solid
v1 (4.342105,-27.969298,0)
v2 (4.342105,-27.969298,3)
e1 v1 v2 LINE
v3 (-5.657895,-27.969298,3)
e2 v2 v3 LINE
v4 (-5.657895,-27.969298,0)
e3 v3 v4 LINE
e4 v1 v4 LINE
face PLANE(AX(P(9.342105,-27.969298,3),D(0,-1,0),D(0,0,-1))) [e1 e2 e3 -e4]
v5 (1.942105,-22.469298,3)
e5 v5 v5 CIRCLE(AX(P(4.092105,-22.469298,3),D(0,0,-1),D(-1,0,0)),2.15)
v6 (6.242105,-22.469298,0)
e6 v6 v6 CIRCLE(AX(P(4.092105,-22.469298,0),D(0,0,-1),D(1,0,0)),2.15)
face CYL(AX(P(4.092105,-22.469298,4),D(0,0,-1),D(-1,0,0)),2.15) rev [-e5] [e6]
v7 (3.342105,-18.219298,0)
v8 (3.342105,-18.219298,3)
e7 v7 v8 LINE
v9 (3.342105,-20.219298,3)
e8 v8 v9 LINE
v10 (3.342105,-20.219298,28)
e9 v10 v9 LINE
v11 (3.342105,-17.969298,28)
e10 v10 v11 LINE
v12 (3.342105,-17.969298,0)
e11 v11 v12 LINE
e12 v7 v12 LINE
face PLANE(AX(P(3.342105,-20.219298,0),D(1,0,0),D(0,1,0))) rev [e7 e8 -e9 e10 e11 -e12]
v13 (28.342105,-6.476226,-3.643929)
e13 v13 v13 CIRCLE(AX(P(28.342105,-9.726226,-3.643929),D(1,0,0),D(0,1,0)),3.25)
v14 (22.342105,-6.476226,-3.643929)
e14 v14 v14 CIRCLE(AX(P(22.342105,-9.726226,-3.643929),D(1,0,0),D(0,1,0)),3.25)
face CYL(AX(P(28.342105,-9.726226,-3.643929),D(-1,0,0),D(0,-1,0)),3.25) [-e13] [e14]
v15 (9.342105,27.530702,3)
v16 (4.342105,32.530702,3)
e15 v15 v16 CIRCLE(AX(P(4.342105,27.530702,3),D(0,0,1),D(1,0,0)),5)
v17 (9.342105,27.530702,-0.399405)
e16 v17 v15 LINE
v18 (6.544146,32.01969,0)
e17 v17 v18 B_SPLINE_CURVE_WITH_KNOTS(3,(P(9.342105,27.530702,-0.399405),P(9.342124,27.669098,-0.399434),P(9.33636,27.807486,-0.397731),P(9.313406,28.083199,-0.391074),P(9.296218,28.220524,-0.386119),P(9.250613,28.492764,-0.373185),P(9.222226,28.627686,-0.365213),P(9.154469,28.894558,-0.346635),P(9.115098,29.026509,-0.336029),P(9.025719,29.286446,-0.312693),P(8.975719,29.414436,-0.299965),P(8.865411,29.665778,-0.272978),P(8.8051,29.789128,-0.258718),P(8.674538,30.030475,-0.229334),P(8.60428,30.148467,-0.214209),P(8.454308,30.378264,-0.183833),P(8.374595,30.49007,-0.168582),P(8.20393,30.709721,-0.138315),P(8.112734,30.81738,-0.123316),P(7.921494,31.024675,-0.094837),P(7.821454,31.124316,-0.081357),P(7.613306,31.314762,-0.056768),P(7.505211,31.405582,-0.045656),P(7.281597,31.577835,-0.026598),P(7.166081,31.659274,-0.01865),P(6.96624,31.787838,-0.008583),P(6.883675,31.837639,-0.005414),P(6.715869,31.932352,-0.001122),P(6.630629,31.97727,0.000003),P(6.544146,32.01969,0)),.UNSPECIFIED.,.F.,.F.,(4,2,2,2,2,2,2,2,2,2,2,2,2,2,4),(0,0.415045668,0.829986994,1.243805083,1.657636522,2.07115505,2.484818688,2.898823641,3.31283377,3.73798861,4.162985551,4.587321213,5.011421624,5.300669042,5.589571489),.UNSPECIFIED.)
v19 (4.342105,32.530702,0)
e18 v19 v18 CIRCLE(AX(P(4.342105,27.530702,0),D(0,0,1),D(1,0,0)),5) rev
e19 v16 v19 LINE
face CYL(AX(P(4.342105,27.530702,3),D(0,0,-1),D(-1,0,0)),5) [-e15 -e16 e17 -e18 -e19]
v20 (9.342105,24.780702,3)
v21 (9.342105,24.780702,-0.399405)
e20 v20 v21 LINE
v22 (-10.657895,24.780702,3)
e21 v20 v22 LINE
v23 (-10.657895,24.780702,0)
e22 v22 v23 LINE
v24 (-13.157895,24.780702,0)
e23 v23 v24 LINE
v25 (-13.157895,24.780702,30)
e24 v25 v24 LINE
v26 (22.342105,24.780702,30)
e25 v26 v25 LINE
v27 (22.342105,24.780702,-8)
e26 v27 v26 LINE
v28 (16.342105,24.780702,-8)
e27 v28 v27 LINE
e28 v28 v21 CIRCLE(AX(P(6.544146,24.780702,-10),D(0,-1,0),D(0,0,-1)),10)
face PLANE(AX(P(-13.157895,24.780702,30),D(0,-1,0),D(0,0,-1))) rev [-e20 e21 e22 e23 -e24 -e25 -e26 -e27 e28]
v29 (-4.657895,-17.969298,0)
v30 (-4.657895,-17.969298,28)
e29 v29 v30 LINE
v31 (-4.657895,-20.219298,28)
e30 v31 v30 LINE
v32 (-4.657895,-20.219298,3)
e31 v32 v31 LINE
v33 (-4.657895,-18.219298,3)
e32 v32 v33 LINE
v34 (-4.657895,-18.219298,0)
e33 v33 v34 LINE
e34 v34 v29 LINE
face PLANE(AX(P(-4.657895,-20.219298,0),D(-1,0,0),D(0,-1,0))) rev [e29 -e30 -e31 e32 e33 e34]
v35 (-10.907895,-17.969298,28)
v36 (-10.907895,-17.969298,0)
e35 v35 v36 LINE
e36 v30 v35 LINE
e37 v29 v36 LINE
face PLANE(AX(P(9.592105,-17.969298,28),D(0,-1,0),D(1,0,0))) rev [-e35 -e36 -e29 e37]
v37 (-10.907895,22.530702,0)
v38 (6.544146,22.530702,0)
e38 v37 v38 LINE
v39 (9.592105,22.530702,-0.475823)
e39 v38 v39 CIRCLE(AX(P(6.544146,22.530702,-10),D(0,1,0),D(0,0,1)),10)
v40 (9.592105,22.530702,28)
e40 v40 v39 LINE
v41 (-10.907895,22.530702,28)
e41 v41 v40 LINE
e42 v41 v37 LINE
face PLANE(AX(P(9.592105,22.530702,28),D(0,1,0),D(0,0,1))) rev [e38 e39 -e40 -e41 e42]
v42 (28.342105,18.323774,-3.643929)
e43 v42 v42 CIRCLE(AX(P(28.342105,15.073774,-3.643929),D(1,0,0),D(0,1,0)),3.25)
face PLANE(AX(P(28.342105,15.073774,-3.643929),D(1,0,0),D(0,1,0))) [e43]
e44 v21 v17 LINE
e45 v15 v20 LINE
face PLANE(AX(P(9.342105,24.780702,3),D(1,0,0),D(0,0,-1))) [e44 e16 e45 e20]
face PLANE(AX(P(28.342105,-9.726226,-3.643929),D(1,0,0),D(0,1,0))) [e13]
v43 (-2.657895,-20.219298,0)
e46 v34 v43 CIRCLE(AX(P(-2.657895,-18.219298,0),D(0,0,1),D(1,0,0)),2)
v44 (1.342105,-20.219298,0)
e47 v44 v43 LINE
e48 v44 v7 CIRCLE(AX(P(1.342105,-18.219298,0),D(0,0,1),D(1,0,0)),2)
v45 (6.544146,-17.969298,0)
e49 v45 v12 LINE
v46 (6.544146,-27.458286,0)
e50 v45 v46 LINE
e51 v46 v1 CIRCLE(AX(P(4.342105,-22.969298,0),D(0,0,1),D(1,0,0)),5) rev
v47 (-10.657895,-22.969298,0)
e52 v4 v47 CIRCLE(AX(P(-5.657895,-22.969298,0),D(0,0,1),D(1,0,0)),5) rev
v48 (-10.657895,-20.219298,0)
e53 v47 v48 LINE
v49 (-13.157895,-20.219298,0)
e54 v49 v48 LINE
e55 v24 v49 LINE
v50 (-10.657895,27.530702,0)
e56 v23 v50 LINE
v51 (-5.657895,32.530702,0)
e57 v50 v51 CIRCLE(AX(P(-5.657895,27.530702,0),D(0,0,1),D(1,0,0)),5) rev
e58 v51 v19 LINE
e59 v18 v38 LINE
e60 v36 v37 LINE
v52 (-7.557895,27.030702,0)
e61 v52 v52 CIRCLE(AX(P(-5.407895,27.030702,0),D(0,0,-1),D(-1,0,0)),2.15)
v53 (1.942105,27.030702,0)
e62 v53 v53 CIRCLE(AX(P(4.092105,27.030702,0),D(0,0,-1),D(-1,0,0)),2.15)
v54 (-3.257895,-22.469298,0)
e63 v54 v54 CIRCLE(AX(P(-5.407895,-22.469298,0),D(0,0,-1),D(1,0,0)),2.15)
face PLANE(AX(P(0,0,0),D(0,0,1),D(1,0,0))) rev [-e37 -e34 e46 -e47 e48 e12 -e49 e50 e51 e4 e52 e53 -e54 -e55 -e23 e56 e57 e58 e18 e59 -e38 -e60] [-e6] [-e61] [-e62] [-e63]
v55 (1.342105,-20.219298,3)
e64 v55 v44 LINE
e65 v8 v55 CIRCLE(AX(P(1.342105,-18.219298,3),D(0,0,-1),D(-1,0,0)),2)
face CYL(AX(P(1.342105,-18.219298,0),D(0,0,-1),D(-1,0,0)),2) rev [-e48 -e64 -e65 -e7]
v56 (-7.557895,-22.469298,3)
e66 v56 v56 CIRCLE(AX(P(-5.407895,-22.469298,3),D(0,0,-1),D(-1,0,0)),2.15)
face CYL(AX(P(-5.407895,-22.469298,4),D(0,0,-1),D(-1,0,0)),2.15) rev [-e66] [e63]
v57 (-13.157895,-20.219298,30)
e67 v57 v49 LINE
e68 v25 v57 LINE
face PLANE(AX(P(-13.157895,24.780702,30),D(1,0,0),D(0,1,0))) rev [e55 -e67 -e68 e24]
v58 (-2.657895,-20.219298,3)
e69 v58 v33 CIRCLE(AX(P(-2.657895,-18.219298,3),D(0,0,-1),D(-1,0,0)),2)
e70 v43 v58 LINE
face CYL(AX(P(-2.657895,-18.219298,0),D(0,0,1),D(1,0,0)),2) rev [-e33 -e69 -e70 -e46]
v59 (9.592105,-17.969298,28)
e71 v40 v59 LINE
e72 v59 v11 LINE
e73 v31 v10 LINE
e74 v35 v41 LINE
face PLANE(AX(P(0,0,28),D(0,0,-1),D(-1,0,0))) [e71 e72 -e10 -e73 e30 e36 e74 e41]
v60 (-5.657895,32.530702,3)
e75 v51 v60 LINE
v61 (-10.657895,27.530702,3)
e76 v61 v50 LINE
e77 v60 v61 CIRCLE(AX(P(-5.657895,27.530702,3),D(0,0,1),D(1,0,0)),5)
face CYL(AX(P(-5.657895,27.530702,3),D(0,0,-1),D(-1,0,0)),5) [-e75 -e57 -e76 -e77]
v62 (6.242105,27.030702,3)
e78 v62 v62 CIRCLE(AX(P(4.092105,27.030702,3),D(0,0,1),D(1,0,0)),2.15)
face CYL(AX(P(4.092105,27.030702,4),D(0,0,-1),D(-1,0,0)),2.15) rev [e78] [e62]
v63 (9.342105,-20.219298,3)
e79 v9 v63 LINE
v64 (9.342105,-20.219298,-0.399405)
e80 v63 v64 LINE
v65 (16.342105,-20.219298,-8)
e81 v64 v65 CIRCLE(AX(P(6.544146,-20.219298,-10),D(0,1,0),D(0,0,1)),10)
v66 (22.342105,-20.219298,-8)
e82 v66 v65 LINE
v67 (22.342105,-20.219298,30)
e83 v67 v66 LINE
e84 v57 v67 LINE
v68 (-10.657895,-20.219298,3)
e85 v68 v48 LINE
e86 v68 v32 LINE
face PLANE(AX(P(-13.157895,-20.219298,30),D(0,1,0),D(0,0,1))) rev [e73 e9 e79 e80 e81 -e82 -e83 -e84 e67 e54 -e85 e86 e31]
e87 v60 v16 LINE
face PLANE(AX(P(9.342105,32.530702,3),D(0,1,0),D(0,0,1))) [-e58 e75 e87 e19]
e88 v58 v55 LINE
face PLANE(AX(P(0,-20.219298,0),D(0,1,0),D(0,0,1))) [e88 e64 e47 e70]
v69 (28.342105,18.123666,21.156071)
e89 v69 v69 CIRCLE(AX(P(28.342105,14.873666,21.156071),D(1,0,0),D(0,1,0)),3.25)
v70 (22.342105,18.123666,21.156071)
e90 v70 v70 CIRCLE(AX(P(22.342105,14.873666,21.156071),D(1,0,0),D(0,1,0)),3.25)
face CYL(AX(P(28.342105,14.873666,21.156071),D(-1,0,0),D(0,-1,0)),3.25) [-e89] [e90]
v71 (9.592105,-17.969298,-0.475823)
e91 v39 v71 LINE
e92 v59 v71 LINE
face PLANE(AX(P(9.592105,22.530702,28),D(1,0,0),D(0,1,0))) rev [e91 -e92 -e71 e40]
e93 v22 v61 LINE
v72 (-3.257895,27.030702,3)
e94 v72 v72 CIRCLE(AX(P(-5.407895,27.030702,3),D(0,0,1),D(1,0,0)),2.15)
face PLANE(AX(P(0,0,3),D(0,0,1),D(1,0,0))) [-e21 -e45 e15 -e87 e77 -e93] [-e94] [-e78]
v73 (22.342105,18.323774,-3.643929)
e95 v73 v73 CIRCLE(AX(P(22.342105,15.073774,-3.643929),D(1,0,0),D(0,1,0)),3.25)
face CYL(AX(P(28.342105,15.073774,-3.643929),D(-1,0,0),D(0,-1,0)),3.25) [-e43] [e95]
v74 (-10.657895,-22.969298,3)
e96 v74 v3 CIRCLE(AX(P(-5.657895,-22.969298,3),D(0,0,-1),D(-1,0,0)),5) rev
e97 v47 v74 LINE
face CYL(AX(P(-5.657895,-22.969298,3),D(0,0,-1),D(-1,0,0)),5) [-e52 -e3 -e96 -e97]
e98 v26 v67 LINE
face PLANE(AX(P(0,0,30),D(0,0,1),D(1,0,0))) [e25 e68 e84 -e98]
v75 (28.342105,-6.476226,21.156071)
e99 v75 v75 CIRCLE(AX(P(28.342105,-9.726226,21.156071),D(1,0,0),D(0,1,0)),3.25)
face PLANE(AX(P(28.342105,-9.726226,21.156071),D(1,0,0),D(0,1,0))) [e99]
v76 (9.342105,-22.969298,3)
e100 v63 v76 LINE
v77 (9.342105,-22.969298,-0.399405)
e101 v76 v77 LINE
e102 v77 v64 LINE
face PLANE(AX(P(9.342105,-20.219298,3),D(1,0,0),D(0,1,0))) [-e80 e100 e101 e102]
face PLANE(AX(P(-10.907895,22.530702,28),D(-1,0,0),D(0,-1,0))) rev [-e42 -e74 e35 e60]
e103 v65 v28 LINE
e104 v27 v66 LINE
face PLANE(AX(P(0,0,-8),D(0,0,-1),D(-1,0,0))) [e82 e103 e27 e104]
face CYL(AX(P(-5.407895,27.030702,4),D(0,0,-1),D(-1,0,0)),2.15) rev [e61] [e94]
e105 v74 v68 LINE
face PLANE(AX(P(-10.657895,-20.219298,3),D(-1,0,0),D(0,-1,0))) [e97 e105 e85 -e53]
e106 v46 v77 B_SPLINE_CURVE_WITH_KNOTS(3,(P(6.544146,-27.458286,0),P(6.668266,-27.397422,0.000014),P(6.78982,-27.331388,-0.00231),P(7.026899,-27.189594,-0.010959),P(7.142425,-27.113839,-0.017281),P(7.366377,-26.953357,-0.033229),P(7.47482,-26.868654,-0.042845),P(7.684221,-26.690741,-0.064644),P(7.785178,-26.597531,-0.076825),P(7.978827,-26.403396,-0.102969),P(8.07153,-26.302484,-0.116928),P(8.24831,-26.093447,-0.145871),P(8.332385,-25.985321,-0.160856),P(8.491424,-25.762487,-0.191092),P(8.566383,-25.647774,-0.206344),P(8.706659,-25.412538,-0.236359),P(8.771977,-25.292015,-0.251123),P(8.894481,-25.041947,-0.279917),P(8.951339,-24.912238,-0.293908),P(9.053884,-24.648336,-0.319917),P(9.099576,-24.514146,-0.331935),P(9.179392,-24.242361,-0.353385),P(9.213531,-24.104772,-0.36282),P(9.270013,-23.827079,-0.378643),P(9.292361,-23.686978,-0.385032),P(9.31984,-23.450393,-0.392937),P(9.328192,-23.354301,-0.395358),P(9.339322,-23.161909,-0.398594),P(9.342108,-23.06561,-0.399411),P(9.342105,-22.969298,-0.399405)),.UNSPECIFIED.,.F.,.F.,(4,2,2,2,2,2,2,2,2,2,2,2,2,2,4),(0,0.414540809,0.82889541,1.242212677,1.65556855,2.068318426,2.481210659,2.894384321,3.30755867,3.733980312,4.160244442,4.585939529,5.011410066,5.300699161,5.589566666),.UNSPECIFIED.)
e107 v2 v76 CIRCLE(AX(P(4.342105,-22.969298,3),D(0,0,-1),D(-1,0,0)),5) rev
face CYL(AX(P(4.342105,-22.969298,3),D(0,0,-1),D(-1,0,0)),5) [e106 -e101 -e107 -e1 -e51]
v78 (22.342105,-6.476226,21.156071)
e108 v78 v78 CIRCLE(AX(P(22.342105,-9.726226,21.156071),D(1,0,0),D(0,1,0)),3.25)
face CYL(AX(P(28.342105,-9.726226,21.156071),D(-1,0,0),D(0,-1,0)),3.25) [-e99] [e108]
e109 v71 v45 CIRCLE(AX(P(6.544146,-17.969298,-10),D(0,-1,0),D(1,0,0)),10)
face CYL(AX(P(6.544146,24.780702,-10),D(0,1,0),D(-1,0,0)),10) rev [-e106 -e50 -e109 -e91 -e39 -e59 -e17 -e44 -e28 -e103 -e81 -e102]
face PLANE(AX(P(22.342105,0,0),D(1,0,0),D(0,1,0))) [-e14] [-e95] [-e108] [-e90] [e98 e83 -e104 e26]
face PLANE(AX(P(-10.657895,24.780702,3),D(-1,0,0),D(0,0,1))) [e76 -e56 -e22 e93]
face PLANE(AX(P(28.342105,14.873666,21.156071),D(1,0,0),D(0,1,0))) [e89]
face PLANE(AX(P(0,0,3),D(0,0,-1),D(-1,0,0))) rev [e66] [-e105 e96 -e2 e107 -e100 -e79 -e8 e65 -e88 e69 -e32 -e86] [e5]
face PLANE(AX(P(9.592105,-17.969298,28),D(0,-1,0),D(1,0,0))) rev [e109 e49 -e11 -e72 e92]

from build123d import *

# Parameters (mm, degrees)
SKETCH1_W           = 25
SKETCH1_H           = 45
BOSS_EXTRUDE1_DEPTH = 30
SKETCH2_W           = 20.5
SKETCH2_H           = 40.5
CUT_EXTRUDE1_DEPTH  = 28
SKETCH3_W           = 20
SKETCH3_H           = 7.75
BOSS_EXTRUDE2_DEPTH = 3
SKETCH5_W           = 8
SKETCH5_H           = 28
CUT_EXTRUDE2_DEPTH  = 2.25
FILLET1_R           = 2
SKETCH6_R           = 2.15
CUT_EXTRUDE3_DEPTH  = 4
FILLET2_R           = 5
SKETCH8_W           = 30
SKETCH8_H           = 45
BOSS_EXTRUDE3_DEPTH = 10.5
SKETCH13_W          = 6
SKETCH13_H          = 45
BOSS_EXTRUDE6_DEPTH = 8
FILLET4_START       = -20.219298246
FILLET4_DEPTH       = 45
FILLET4_START_2     = -27.458286573
FILLET4_2_DEPTH     = 9.488988327
FILLET4_START_3     = 22.530701754
FILLET4_3_DEPTH     = 9.488988328
FILLET4_START_4     = -1
FILLET4_4_OUTLINE_W = 0.25
FILLET4_4_OUTLINE_H = 40.5
FILLET4_4_DEPTH     = 1
SKETCH14_R          = 3.25
BOSS_EXTRUDE7_DEPTH = 6


with BuildPart() as part:
    # Sketch1 → Boss-Extrude1 (new body)
    with BuildSketch(Plane.XY):
        with Locations((-0.657894737, 2.280701754)):
            Rectangle(SKETCH1_W, SKETCH1_H)
    extrude(amount=BOSS_EXTRUDE1_DEPTH)

    # Sketch2 → Cut-Extrude1 (cut)
    with BuildSketch(Plane(origin=(0, 0, 0), x_dir=(-1, 0, 0), z_dir=(0, 0, -1))):
        with Locations((0.657894737, 2.280701754)):
            Rectangle(SKETCH2_W, SKETCH2_H)
    extrude(amount=-CUT_EXTRUDE1_DEPTH, mode=Mode.SUBTRACT)

    # Sketch3 → Boss-Extrude2 (add)
    with BuildSketch(Plane(origin=(0, 0, 0), x_dir=(-1, 0, 0), z_dir=(0, 0, -1))):
        with Locations((0.657894737, 28.655701754)):
            Rectangle(SKETCH3_W, SKETCH3_H)
        with Locations((0.657894737, -24.094298246)):
            Rectangle(SKETCH3_W, SKETCH3_H)
    extrude(amount=-BOSS_EXTRUDE2_DEPTH)

    # Sketch5 → Cut-Extrude2 (cut)
    with BuildSketch(Plane(origin=(0, -17.969298246, 0), x_dir=(1, 0, 0), z_dir=(0, 1, 0))):
        with Locations((-0.657894737, -14)):
            Rectangle(SKETCH5_W, SKETCH5_H)
    extrude(amount=-CUT_EXTRUDE2_DEPTH, mode=Mode.SUBTRACT)

    # Fillet1
    fillet1_edges = [part.edges().sort_by_distance(p)[0] for p in [
        (-4.657894737, -20.219298246, 1.5),
        (3.342105263, -20.219298246, 1.5),
    ]]
    fillet(fillet1_edges, radius=FILLET1_R)

    # Sketch6 → Cut-Extrude3 (cut)
    with BuildSketch(Plane(origin=(0, 0, 0), x_dir=(-1, 0, 0), z_dir=(0, 0, -1))):
        with Locations((-4.092105263, 27.030701754)):
            Circle(SKETCH6_R)
        with Locations((5.407894737, 27.030701754)):
            Circle(SKETCH6_R)
        with Locations((5.407894737, -22.469298246)):
            Circle(SKETCH6_R)
        with Locations((-4.092105263, -22.469298246)):
            Circle(SKETCH6_R)
    extrude(amount=-CUT_EXTRUDE3_DEPTH, mode=Mode.SUBTRACT)

    # Fillet2
    fillet2_edges = [part.edges().sort_by_distance(p)[0] for p in [
        (9.342105263, 32.530701754, 1.5),
        (-10.657894737, 32.530701754, 1.5),
        (9.342105263, -27.969298246, 1.5),
        (-10.657894737, -27.969298246, 1.5),
    ]]
    fillet(fillet2_edges, radius=FILLET2_R)

    # Sketch8 → Boss-Extrude3 (add)
    with BuildSketch(Plane(origin=(11.842105263, 0, 0), x_dir=(0, 0, -1), z_dir=(1, 0, 0))):
        with Locations((-15, 2.280701754)):
            Rectangle(SKETCH8_W, SKETCH8_H)
    extrude(amount=BOSS_EXTRUDE3_DEPTH)

    # Sketch13 → Boss-Extrude6 (add)
    with BuildSketch(Plane(origin=(0, 0, 0), x_dir=(-1, 0, 0), z_dir=(0, 0, -1))):
        with Locations((-19.342105263, 2.280701754)):
            Rectangle(SKETCH13_W, SKETCH13_H)
    extrude(amount=BOSS_EXTRUDE6_DEPTH)

    # Fillet4: read off the stored shape, not the designer's step
    # Fillet4 outline → Fillet4 (add)
    with BuildSketch(Plane(origin=(0, 0, 0), x_dir=(1, 0, 0), z_dir=(0, 1, 0)).offset(FILLET4_START)):
        with BuildLine():
            Line((9.342105263, 0.399404936), (9.342105263, 0))
            Line((9.342105263, 0), (16.342105263, 0))
            Line((16.342105263, 0), (16.342105263, 8))
            ThreePointArc((16.342105263, 8), (13.899861657, 3.225529433), (9.342105263, 0.399404936))
        make_face()
    extrude(amount=FILLET4_DEPTH)

    # Fillet4 2 outline → Fillet4 2 (add)
    with BuildSketch(Plane(origin=(0, 0, 0), x_dir=(1, 0, 0), z_dir=(0, 1, 0)).offset(FILLET4_START_2)):
        with BuildLine():
            Line((6.544146292, 0), (9.342105263, 0))
            Line((9.342105263, 0), (9.342105263, 0.399404936))
            ThreePointArc((9.342105263, 0.399404936), (7.957307527, 0.100354788), (6.544146292, 0))
        make_face()
    extrude(amount=FILLET4_2_DEPTH)

    # Fillet4 3 outline → Fillet4 3 (add)
    with BuildSketch(Plane(origin=(0, 0, 0), x_dir=(1, 0, 0), z_dir=(0, 1, 0)).offset(FILLET4_START_3)):
        with BuildLine():
            Line((6.544146292, 0), (9.342105263, 0))
            Line((9.342105263, 0), (9.342105263, 0.399404936))
            ThreePointArc((9.342105263, 0.399404936), (7.957307527, 0.100354788), (6.544146292, 0))
        make_face()
    extrude(amount=FILLET4_3_DEPTH)

    # Fillet4 4 outline → Fillet4 4 (cut)
    with BuildSketch(Plane.XY.offset(FILLET4_START_4)):
        with BuildLine():
            Line((9.342105263, -27.458286573), (9.342105263, -22.969298246))
            ThreePointArc((9.342105263, -22.969298246), (8.58534724, -25.614085104), (6.544146253, -27.458286493))
            Line((6.544146253, -27.458286493), (9.342105263, -27.458286573))
        make_face()
        with BuildLine():
            Line((9.342105263, 32.019690082), (6.544146252, 32.019690001))
            ThreePointArc((6.544146252, 32.019690001), (8.58534724, 30.175488613), (9.342105263, 27.530701754))
            Line((9.342105263, 27.530701754), (9.342105263, 32.019690082))
        make_face()
        with Locations((9.467105263, 2.280701754)):
            Rectangle(FILLET4_4_OUTLINE_W, FILLET4_4_OUTLINE_H)
    extrude(amount=FILLET4_4_DEPTH, mode=Mode.SUBTRACT)

    # Sketch14 → Boss-Extrude7 (add)
    with BuildSketch(Plane(origin=(22.342105263, 0, 0), x_dir=(0, 0, -1), z_dir=(1, 0, 0))):
        with Locations(Location((-21.156070928, 14.873665711, 0), (0, 0, 90))):
            Circle(SKETCH14_R)
        with Locations(Location((3.643929072, 15.073774065, 0), (0, 0, 90))):
            Circle(SKETCH14_R)
        with Locations(Location((3.643929072, -9.726225935, 0), (0, 0, 90))):
            Circle(SKETCH14_R)
        with Locations(Location((-21.156070928, -9.726225935, 0), (0, 0, 90))):
            Circle(SKETCH14_R)
    extrude(amount=BOSS_EXTRUDE7_DEPTH)


solid = part.part
